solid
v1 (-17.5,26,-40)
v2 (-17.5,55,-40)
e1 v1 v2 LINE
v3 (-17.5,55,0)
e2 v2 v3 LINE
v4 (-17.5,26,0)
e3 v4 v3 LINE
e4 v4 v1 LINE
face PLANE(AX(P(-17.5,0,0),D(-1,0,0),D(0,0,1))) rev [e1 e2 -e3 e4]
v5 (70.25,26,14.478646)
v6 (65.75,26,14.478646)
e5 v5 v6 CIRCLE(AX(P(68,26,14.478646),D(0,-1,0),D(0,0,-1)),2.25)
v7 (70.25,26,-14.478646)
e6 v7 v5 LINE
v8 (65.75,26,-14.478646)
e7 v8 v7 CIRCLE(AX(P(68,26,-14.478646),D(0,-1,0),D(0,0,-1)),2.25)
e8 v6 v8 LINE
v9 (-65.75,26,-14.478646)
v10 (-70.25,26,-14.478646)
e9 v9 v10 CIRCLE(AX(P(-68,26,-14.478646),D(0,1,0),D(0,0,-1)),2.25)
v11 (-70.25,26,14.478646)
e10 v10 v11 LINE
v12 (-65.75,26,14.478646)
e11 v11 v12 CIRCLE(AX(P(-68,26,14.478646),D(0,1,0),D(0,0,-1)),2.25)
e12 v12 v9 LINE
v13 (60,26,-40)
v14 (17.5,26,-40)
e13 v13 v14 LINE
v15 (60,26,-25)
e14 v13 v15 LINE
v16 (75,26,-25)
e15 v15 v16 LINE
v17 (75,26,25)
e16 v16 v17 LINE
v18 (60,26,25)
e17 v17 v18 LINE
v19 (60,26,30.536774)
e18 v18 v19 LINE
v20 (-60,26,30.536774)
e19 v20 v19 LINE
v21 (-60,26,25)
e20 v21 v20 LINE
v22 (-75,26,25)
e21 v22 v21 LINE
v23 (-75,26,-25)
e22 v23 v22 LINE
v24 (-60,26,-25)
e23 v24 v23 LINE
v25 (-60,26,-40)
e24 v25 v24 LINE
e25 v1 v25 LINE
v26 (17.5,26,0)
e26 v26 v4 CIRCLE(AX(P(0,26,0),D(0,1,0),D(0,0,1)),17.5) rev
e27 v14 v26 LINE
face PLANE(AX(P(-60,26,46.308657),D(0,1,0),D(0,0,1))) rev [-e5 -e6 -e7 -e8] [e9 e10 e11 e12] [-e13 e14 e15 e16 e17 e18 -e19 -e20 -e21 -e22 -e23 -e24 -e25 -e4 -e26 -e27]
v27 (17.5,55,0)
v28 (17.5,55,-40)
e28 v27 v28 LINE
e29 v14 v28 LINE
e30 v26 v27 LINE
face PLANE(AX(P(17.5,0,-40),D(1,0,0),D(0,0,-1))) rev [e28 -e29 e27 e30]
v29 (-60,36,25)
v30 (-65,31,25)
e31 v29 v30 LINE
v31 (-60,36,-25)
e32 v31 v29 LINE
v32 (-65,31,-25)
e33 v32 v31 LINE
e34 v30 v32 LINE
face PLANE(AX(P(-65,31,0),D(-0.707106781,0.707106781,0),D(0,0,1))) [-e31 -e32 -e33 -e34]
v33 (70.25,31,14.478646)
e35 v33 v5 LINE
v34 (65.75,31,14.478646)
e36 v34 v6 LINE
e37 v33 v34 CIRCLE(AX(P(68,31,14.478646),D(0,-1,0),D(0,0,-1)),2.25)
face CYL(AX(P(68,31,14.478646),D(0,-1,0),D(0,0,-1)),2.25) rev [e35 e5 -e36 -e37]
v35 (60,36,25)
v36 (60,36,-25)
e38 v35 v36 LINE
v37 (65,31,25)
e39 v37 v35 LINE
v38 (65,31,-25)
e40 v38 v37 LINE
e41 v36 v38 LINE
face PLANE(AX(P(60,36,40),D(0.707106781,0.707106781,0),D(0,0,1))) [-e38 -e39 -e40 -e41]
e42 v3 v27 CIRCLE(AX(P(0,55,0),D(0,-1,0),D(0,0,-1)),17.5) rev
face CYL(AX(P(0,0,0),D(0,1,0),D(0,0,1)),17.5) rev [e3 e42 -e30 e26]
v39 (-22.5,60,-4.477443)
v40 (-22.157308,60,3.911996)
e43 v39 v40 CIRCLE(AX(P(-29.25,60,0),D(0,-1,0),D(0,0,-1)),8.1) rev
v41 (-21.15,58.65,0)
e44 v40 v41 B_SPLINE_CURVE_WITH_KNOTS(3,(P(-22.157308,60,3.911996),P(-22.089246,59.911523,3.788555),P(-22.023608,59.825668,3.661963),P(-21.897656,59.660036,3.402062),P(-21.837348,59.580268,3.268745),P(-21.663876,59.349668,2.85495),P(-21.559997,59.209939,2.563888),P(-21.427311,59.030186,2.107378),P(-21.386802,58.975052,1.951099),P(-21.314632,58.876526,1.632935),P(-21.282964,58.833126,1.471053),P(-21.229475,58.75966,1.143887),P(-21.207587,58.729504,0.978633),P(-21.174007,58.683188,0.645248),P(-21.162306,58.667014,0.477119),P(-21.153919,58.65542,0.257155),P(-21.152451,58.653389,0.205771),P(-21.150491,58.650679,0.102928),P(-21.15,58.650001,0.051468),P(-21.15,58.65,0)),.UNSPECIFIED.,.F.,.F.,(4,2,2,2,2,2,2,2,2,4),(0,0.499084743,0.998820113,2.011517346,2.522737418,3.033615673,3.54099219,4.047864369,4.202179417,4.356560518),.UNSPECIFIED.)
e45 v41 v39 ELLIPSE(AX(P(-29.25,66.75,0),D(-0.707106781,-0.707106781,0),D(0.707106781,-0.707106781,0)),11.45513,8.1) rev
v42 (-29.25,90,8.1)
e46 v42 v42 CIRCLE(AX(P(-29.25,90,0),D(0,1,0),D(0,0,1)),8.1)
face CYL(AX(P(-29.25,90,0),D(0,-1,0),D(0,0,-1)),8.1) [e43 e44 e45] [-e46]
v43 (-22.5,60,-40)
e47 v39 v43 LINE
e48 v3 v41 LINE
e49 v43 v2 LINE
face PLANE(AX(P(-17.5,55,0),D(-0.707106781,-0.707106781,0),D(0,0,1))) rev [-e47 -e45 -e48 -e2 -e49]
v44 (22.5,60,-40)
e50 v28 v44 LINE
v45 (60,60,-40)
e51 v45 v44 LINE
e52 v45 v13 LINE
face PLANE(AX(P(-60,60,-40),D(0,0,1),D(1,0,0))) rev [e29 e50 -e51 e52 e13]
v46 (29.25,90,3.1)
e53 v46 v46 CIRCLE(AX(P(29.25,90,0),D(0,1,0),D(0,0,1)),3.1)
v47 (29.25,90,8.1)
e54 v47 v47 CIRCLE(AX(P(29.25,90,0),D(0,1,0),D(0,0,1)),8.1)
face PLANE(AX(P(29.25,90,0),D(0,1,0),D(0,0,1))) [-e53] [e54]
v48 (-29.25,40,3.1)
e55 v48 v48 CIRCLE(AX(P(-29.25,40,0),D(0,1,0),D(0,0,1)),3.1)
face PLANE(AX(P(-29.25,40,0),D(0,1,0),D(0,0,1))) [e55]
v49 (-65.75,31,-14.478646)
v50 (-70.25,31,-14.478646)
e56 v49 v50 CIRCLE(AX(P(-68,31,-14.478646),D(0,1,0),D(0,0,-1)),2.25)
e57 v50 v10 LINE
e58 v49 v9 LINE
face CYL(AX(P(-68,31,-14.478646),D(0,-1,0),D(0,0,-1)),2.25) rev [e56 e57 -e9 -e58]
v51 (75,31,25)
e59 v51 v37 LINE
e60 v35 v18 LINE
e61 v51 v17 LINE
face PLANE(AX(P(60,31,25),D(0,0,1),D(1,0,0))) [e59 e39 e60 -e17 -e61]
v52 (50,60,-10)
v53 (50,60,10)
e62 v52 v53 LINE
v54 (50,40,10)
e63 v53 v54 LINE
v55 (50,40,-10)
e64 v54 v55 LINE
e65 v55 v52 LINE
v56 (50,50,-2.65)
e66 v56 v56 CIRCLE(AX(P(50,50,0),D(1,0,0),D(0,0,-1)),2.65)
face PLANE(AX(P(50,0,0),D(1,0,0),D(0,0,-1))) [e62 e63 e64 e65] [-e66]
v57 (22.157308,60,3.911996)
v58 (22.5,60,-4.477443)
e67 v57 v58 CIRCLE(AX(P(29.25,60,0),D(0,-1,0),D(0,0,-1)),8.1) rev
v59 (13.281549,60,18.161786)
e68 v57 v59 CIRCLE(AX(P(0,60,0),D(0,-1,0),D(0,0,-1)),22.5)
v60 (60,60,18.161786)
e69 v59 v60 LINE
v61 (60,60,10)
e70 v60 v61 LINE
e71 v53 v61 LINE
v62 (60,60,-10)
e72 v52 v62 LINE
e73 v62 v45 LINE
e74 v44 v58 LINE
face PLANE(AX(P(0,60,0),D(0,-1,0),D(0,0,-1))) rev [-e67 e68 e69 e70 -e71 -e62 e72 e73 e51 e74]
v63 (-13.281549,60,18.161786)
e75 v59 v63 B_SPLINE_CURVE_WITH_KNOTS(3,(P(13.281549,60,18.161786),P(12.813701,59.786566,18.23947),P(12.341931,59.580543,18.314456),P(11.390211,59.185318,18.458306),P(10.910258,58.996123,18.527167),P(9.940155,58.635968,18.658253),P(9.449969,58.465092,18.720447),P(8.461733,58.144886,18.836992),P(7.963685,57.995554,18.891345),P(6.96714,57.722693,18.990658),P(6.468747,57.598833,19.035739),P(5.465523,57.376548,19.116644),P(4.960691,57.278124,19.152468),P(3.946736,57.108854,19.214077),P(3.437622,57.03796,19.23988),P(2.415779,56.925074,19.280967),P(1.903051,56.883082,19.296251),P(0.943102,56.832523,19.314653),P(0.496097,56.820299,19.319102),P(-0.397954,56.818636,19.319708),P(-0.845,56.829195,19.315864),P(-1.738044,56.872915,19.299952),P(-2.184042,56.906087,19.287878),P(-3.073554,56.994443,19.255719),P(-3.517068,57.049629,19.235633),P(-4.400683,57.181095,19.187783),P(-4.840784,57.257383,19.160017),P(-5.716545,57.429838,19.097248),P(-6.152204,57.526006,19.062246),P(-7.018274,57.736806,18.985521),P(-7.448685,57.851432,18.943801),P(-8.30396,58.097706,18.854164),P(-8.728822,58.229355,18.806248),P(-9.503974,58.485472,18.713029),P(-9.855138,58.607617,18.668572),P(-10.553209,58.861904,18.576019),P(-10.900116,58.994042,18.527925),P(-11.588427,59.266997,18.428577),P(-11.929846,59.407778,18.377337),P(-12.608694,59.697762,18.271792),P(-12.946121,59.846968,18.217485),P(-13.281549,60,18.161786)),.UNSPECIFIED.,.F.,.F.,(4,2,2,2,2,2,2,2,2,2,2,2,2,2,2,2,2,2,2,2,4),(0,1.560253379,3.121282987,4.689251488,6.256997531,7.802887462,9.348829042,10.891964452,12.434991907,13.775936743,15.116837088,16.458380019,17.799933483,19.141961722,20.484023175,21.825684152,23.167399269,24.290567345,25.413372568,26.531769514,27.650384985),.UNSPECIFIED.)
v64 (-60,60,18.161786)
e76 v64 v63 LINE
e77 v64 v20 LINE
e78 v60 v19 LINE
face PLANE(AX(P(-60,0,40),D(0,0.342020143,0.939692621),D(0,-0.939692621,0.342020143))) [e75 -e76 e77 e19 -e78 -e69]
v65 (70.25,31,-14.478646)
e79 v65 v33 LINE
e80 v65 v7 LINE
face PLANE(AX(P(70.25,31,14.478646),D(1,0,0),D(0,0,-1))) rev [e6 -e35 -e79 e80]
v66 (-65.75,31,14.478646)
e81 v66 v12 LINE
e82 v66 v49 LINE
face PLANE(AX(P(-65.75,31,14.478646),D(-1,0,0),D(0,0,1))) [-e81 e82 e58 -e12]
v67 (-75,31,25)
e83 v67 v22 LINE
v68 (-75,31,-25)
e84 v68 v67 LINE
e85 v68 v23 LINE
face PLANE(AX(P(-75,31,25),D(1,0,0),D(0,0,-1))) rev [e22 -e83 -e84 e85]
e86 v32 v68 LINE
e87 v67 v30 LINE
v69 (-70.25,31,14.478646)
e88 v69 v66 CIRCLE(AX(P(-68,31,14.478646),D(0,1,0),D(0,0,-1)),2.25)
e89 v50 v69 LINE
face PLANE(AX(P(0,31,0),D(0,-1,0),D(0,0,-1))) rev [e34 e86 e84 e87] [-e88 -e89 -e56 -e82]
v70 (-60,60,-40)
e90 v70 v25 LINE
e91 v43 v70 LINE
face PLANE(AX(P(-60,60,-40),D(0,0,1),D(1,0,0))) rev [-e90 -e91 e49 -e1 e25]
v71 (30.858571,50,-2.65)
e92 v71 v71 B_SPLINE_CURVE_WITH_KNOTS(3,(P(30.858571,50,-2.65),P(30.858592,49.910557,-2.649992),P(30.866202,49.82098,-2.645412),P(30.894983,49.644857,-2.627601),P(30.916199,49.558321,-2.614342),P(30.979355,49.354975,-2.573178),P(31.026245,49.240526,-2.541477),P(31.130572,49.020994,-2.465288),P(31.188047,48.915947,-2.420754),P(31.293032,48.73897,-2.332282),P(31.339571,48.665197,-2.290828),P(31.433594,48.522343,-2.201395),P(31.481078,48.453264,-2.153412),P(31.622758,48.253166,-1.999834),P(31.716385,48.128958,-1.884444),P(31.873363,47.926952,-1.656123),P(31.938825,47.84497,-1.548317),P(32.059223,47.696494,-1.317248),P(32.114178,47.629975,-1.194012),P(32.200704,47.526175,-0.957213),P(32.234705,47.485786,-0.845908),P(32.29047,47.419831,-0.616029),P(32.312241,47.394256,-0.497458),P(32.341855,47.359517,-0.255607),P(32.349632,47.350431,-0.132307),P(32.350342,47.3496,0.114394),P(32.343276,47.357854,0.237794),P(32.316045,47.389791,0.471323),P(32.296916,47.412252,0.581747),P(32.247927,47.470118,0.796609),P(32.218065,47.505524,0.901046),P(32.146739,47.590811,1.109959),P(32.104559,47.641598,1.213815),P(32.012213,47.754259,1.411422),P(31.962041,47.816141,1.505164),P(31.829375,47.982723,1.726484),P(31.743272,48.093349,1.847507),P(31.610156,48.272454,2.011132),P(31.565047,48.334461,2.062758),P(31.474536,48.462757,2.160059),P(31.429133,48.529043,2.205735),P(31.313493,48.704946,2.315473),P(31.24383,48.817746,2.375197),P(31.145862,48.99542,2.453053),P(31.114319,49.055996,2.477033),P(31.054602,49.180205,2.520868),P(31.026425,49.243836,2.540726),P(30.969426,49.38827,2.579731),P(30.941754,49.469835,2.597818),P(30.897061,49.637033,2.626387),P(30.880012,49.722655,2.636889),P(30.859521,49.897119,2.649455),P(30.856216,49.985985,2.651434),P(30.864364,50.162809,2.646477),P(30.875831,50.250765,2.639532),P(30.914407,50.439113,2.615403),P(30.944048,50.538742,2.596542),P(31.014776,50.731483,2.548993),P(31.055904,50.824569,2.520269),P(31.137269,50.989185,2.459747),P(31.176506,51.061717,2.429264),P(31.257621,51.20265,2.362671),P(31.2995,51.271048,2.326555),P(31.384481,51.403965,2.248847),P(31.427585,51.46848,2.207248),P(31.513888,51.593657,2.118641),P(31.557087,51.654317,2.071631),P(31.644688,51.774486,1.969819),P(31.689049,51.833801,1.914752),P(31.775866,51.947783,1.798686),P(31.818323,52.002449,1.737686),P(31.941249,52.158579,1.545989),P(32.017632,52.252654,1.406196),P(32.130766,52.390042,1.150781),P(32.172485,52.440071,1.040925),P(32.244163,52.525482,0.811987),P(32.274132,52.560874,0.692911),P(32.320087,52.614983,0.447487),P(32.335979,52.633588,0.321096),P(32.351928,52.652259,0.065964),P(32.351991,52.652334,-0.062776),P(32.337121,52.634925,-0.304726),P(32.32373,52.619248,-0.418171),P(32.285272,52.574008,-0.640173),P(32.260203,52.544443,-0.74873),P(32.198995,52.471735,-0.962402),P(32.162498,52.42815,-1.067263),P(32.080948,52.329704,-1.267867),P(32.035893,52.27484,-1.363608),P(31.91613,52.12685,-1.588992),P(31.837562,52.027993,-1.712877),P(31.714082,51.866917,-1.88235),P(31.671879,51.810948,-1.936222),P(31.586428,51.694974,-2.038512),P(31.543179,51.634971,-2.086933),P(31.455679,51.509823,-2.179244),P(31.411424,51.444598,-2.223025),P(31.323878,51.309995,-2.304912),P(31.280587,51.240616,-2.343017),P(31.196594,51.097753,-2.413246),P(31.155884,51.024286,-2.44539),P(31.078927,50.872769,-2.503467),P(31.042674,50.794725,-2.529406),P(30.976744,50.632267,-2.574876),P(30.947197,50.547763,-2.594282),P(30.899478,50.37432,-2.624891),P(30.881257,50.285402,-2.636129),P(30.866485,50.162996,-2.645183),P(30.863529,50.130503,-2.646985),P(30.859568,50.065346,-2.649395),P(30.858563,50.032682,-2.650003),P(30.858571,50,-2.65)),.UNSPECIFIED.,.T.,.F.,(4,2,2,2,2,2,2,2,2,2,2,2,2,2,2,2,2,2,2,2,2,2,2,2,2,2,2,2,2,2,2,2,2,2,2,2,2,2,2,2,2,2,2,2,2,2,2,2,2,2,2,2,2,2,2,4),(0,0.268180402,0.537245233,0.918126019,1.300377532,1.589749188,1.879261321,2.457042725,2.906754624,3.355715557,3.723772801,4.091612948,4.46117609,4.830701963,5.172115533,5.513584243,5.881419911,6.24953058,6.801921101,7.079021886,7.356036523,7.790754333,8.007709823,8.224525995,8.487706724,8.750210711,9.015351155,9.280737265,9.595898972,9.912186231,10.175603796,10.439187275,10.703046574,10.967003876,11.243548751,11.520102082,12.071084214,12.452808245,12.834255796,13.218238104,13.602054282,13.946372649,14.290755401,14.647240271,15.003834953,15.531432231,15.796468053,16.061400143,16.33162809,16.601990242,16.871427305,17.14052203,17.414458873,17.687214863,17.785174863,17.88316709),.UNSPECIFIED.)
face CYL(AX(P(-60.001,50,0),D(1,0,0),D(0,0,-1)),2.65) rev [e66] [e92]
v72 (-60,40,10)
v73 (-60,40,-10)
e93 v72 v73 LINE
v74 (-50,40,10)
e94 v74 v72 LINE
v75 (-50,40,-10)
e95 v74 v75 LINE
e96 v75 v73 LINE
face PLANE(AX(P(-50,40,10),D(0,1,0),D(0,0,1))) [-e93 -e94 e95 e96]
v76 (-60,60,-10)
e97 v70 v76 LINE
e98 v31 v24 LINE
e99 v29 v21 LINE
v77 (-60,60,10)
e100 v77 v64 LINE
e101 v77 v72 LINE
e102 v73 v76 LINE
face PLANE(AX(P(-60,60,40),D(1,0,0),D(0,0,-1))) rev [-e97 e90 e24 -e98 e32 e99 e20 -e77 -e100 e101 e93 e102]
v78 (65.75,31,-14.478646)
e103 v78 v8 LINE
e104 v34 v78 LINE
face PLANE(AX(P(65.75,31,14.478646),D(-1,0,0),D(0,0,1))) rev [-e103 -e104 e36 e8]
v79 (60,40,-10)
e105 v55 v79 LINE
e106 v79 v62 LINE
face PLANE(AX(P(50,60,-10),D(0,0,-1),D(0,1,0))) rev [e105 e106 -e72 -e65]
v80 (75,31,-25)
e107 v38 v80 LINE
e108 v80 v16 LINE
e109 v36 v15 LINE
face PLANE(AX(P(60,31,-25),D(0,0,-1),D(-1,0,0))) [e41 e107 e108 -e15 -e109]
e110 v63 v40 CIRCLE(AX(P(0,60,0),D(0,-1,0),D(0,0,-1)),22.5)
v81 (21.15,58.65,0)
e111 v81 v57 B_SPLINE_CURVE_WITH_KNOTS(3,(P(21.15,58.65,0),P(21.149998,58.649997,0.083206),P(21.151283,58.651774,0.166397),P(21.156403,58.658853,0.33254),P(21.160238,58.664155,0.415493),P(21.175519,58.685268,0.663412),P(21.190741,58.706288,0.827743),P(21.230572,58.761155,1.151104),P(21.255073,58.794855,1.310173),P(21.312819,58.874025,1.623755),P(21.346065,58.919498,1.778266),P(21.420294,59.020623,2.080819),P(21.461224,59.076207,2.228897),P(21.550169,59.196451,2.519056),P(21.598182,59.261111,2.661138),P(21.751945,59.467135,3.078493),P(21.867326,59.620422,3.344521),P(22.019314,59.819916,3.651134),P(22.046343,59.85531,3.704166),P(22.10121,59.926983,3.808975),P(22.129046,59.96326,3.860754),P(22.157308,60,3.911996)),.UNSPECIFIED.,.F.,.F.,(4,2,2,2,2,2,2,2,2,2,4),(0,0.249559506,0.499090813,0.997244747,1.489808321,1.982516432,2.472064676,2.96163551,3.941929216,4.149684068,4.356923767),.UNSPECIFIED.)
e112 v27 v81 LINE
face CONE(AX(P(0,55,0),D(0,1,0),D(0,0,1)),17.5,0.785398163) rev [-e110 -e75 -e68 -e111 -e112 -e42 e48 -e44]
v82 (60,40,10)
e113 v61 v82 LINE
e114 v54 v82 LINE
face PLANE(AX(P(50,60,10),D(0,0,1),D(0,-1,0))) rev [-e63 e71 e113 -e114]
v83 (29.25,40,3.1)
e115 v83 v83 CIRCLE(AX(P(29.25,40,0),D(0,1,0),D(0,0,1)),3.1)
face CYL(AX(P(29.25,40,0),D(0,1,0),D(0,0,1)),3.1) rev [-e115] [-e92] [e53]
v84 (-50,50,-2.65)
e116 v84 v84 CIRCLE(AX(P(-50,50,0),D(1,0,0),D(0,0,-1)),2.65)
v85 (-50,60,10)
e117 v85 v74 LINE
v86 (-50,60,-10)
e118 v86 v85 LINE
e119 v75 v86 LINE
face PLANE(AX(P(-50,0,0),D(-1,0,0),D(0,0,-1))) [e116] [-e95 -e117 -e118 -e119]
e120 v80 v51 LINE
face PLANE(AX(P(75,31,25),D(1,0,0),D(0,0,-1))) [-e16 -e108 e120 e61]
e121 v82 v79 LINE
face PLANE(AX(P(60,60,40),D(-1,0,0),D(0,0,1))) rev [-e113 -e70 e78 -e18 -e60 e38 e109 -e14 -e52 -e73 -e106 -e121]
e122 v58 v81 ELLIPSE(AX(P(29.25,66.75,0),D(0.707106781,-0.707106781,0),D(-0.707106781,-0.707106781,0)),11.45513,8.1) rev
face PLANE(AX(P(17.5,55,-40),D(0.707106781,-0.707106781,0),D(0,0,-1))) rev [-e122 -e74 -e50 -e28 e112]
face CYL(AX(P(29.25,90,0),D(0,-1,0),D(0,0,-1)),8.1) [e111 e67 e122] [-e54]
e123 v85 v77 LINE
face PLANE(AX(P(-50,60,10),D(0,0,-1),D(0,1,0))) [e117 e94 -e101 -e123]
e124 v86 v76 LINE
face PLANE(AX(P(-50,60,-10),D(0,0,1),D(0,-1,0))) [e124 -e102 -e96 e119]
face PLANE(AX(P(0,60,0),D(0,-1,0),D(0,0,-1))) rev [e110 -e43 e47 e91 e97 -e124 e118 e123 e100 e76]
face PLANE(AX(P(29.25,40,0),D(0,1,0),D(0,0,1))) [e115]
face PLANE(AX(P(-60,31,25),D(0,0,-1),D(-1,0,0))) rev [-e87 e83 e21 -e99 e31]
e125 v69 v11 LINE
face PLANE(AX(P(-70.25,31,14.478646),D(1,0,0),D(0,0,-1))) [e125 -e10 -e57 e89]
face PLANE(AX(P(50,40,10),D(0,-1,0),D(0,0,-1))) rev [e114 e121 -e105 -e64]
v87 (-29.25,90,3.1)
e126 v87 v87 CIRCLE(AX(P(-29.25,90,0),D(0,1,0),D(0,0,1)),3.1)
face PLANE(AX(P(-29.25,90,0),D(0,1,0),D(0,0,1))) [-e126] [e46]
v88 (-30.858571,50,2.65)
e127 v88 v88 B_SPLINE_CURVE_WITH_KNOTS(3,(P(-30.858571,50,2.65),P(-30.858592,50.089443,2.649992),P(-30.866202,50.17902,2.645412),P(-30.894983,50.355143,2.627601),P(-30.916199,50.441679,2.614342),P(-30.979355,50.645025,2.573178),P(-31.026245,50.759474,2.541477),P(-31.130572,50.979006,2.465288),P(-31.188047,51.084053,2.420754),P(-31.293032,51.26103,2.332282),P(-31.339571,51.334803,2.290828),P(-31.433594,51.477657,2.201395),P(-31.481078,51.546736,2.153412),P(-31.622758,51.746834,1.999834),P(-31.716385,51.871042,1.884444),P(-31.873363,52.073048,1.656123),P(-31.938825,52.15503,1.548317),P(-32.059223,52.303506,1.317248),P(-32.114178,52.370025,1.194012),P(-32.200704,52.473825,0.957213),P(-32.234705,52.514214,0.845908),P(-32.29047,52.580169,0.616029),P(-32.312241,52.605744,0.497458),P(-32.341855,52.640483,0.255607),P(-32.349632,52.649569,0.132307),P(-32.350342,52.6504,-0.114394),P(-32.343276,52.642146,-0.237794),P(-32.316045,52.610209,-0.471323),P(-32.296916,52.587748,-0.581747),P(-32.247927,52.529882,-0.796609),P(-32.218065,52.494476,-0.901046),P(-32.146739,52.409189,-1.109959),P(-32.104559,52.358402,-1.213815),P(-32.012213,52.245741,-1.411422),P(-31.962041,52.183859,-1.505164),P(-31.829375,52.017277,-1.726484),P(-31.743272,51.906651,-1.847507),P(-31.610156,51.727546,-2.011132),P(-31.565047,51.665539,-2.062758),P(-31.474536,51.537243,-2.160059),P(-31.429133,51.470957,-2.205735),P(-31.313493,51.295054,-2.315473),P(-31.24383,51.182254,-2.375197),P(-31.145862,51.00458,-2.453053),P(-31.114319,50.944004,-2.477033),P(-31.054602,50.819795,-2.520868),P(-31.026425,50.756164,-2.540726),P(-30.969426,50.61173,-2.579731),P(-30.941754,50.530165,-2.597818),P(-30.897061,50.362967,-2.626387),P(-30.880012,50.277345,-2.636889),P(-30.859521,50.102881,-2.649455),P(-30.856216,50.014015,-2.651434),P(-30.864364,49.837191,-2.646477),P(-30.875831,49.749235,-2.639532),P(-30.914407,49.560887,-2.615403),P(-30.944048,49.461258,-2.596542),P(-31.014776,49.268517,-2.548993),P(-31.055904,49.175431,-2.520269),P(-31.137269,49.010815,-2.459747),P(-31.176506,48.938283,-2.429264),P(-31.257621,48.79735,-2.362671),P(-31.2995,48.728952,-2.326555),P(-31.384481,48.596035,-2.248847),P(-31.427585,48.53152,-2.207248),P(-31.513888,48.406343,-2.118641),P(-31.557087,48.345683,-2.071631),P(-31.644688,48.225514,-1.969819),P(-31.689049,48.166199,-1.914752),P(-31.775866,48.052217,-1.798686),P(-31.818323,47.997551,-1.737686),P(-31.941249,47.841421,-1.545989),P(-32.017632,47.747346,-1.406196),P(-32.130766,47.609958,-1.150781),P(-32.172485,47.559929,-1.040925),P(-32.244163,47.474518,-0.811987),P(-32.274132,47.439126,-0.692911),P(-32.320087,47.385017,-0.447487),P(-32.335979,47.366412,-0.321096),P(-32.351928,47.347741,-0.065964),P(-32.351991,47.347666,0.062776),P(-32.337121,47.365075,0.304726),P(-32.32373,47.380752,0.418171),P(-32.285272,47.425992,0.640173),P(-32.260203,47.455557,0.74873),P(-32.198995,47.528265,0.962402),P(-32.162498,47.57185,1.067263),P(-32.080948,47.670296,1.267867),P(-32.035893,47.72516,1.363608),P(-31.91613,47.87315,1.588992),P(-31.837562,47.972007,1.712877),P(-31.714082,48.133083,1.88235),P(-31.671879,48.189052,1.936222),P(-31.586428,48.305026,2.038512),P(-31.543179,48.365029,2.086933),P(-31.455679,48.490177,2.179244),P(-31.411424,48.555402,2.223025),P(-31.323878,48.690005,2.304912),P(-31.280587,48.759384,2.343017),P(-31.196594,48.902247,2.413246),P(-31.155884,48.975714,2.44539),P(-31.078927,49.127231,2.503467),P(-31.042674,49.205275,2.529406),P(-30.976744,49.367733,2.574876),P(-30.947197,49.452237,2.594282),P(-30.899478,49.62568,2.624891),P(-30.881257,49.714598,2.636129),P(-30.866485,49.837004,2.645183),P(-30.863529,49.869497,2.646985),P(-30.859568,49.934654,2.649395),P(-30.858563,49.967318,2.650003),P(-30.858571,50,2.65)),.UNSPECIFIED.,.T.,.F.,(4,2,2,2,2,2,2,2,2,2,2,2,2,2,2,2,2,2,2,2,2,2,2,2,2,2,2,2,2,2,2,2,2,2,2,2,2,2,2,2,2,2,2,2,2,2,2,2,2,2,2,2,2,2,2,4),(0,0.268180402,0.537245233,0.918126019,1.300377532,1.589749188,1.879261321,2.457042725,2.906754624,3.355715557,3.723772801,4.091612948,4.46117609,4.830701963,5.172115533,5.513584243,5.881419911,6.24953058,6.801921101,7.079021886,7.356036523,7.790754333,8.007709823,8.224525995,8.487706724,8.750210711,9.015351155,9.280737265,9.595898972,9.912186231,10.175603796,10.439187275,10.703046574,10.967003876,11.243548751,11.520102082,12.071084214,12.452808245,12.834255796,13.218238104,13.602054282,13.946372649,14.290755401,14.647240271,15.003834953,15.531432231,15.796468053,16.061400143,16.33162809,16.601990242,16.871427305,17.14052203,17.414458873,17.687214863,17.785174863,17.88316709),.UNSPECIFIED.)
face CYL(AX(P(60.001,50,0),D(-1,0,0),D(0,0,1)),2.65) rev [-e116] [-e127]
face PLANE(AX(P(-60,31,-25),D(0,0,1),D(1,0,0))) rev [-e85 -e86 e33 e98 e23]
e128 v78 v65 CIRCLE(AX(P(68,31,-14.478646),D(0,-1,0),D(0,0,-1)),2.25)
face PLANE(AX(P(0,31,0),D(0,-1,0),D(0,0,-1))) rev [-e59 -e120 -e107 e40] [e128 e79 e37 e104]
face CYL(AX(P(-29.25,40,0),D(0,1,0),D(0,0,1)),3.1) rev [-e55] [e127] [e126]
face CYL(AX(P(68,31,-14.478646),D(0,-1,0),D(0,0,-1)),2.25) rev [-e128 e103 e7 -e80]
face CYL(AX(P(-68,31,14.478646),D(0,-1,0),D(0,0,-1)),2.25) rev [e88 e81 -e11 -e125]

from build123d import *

# Parameters (mm, degrees)
SKETCH1_W               = 120
SKETCH1_H               = 80
BOSS_EXTRUDE1_DEPTH     = 60
CUT_EXTRUDE1_DEPTH      = 94.808315196
SKETCH10_R              = 3.1
CUT_EXTRUDE4_DEPTH      = 20
BOSS_EXTRUDE2_START     = 30
SKETCH4_R               = 8.1
SKETCH4_R_2             = 3.1
BOSS_EXTRUDE2_DEPTH     = 30
SKETCH5_W               = 20
SKETCH5_H               = 20
CUT_EXTRUDE3_DEPTH      = 10
CUT_EXTRUDE5_REACH      = 149.648
CUT_EXTRUDE5_END_RADIUS = 3.1
SKETCH6_R               = 2.65
DRAFT2_ANGLE            = -20
CHAMFER3_SIZE           = 5
SKETCH11_W              = 95.774005991
SKETCH11_H              = 26
CUT_EXTRUDE6_DEPTH      = 156.241747021
SKETCH13_W              = 15
SKETCH13_H              = 50
BOSS_EXTRUDE3_DEPTH     = 5
CHAMFER4_SIZE           = 5


with BuildPart() as part:
    # Sketch1 → Boss-Extrude1 (new body)
    with BuildSketch(Plane(origin=(0, 0, 0), x_dir=(1, 0, 0), z_dir=(0, 1, 0))):
        Rectangle(SKETCH1_W, SKETCH1_H)
    extrude(amount=BOSS_EXTRUDE1_DEPTH)

    # Sketch2 → Cut-Extrude1 (cut, through all)
    with BuildSketch(Plane(origin=(0, 60, 0), x_dir=(1, 0, 0), z_dir=(0, 1, 0))):
        with BuildLine():
            Line((-17.5, 0), (-17.5, 40))
            Line((-17.5, 40), (17.5, 40))
            Line((17.5, 40), (17.5, 0))
            ThreePointArc((17.5, 0), (0, -17.5), (-17.5, 0))
        make_face()
    extrude(amount=-CUT_EXTRUDE1_DEPTH, mode=Mode.SUBTRACT)

    # Sketch10 → Cut-Extrude4 (cut)
    with BuildSketch(Plane(origin=(0, 60, 0), x_dir=(1, 0, 0), z_dir=(0, 1, 0))):
        with Locations(Location((-29.25, 0, 0), (0, 0, 270))):
            Circle(SKETCH10_R)
        with Locations(Location((29.25, 0, 0), (0, 0, 270))):
            Circle(SKETCH10_R)
    extrude(amount=-CUT_EXTRUDE4_DEPTH, mode=Mode.SUBTRACT)

    # Sketch4 → Boss-Extrude2 (add)
    # profile 1 of 2: a face of its own
    with BuildSketch(Plane(origin=(0, 60, 0), x_dir=(1, 0, 0), z_dir=(0, 1, 0)).offset(BOSS_EXTRUDE2_START)):
        with Locations(Location((29.25, 0, 0), (0, 0, 90))):
            Circle(SKETCH4_R)
        with Locations(Location((29.25, 0, 0), (0, 0, 270))):
            Circle(SKETCH4_R_2, mode=Mode.SUBTRACT)
    # profile 2 of 2: a face of its own
    with BuildSketch(Plane(origin=(0, 60, 0), x_dir=(1, 0, 0), z_dir=(0, 1, 0)).offset(BOSS_EXTRUDE2_START)):
        with Locations(Location((-29.25, 0, 0), (0, 0, 90))):
            Circle(SKETCH4_R)
        with Locations(Location((-29.25, 0, 0), (0, 0, 270))):
            Circle(SKETCH4_R_2, mode=Mode.SUBTRACT)
    extrude(amount=-BOSS_EXTRUDE2_DEPTH)

    # Sketch5 → Cut-Extrude3 (cut)
    with BuildSketch(Plane(origin=(60, 0, 0), x_dir=(0, 0, -1), z_dir=(1, 0, 0))):
        with Locations((0, 50)):
            Rectangle(SKETCH5_W, SKETCH5_H)
    cut_extrude3 = extrude(amount=-CUT_EXTRUDE3_DEPTH, mode=Mode.SUBTRACT)

    # Cut-Extrude5: up to this cylinder (the profile starts outside it)
    cut_extrude5_end = Plane(origin=(29.25, 50, 0), z_dir=(0, 1, 0)) * Cylinder(CUT_EXTRUDE5_END_RADIUS, 306.496, mode=Mode.PRIVATE)
    # Sketch6 → Cut-Extrude5 (cut, up to the surface)
    with BuildSketch(Plane(origin=(50, 0, 0), x_dir=(0, 0, -1), z_dir=(1, 0, 0)), mode=Mode.PRIVATE) as cut_extrude5_sk1:
        with Locations((0, 50)):
            Circle(SKETCH6_R)
    cut_extrude5_tool1 = extrude(cut_extrude5_sk1.sketch, amount=-CUT_EXTRUDE5_REACH, mode=Mode.PRIVATE) - cut_extrude5_end
    cut_extrude5 = cut_extrude5_tool1.solids().sort_by_distance((50, 50, 0))[0]
    add(cut_extrude5, mode=Mode.SUBTRACT)

    # Mirror2: Cut-Extrude3, Cut-Extrude5 across plane
    add(cut_extrude3.mirror(Plane(origin=(0, 0, 0), x_dir=(0, 0, 1), z_dir=(1, 0, 0))), mode=Mode.SUBTRACT)
    add(cut_extrude5.mirror(Plane(origin=(0, 0, 0), x_dir=(0, 0, 1), z_dir=(1, 0, 0))), mode=Mode.SUBTRACT)

    # Draft2
    draft2_faces = [part.faces().sort_by_distance(p)[0] for p in [
        (0, 30, 40),
    ]]
    draft(draft2_faces, Plane(origin=(0, 0, 0), x_dir=(0, 0, -1), z_dir=(0, -1, 0)), DRAFT2_ANGLE)

    # Chamfer3
    # the kernel refuses this chamfer: 5 mm, written as the material it takes off along each edge
    with BuildSketch(Plane(origin=(0, 60, 0), x_dir=(1, 0, 0), z_dir=(0, 0, -1))) as chamfer3_piece_1_section:
        Polygon((17.5 + CHAMFER3_SIZE, 0), (17.5, CHAMFER3_SIZE), (17.5, 0), align=None)
    chamfer3_piece_1 = revolve(axis=Axis((0, 60, 0), (0, -1, 0)), revolution_arc=180, mode=Mode.PRIVATE)
    chamfer3_piece_1 = chamfer3_piece_1 - Plane(origin=(-29.25, 57.566241365, 0), x_dir=(0, 0, -1), z_dir=(0, 1, 0)) * Cylinder(8.1, 90, mode=Mode.PRIVATE)
    chamfer3_piece_1 = chamfer3_piece_1 - Plane(origin=(29.25, 57.566241365, 0), x_dir=(0, 0, -1), z_dir=(0, 1, 0)) * Cylinder(8.1, 90, mode=Mode.PRIVATE)
    add(chamfer3_piece_1, mode=Mode.SUBTRACT)
    with BuildSketch(Plane(origin=(17.5, 60, -52.85841494), x_dir=(0.9996219169112968, 0.027495876610586317, 0), z_dir=(0, 0, 1))) as chamfer3_piece_2_section:
        Polygon((CHAMFER3_SIZE * 0.999621916911, -CHAMFER3_SIZE * 0.0274958766106), (-CHAMFER3_SIZE * 0.0274958766106, -CHAMFER3_SIZE * 0.999621916911), (0, 0), align=None)
    chamfer3_piece_2 = extrude(amount=52.85841494, mode=Mode.PRIVATE)
    chamfer3_piece_2 = chamfer3_piece_2 - Plane(origin=(29.25, 58.344986743, 0), x_dir=(0, 0, -1), z_dir=(0, 1, 0)) * Cylinder(8.1, 126, mode=Mode.PRIVATE)
    add(chamfer3_piece_2, mode=Mode.SUBTRACT)
    with BuildSketch(Plane(origin=(-17.5, 60, 0), x_dir=(-0.9996219169112968, 0.027495876610586317, 0), z_dir=(0, 0, -1))) as chamfer3_piece_3_section:
        Polygon((CHAMFER3_SIZE * 0.999621916911, -CHAMFER3_SIZE * 0.0274958766106), (-CHAMFER3_SIZE * 0.0274958766106, -CHAMFER3_SIZE * 0.999621916911), (0, 0), align=None)
    chamfer3_piece_3 = extrude(amount=52.85841494, mode=Mode.PRIVATE)
    chamfer3_piece_3 = chamfer3_piece_3 - Plane(origin=(-29.25, 58.344986743, 0), x_dir=(0, 0, -1), z_dir=(0, 1, 0)) * Cylinder(8.1, 126, mode=Mode.PRIVATE)
    add(chamfer3_piece_3, mode=Mode.SUBTRACT)

    # Sketch11 → Cut-Extrude6 (cut, through all)
    with BuildSketch(Plane(origin=(60, 0, 0), x_dir=(0, 0, -1), z_dir=(1, 0, 0))):
        with Locations((1.578345518, 13)):
            Rectangle(SKETCH11_W, SKETCH11_H)
    extrude(amount=-CUT_EXTRUDE6_DEPTH, mode=Mode.SUBTRACT)

    # Sketch13 → Boss-Extrude3 (add)
    with BuildSketch(Plane.XZ.offset(-26)):
        with Locations((67.5, 0)):
            Rectangle(SKETCH13_W, SKETCH13_H)
        with BuildLine():
            Line((70.25, 14.478646417), (70.25, -14.478646417))
            ThreePointArc((70.25, -14.478646417), (68, -16.728646417), (65.75, -14.478646417))
            Line((65.75, -14.478646417), (65.75, 14.478646417))
            ThreePointArc((65.75, 14.478646417), (68, 16.728646417), (70.25, 14.478646417))
        make_face(mode=Mode.SUBTRACT)
    boss_extrude3 = extrude(amount=-BOSS_EXTRUDE3_DEPTH)

    # Mirror3: Boss-Extrude3 across plane
    add(boss_extrude3.mirror(Plane(origin=(0, 0, 0), x_dir=(0, 0, 1), z_dir=(1, 0, 0))))

    # Chamfer4
    chamfer4_edges = [part.edges().sort_by_distance(p)[0] for p in [
        (60, 31, 0),
        (-60, 31, 0),
    ]]
    chamfer(chamfer4_edges, length=CHAMFER4_SIZE)


solid = part.part
